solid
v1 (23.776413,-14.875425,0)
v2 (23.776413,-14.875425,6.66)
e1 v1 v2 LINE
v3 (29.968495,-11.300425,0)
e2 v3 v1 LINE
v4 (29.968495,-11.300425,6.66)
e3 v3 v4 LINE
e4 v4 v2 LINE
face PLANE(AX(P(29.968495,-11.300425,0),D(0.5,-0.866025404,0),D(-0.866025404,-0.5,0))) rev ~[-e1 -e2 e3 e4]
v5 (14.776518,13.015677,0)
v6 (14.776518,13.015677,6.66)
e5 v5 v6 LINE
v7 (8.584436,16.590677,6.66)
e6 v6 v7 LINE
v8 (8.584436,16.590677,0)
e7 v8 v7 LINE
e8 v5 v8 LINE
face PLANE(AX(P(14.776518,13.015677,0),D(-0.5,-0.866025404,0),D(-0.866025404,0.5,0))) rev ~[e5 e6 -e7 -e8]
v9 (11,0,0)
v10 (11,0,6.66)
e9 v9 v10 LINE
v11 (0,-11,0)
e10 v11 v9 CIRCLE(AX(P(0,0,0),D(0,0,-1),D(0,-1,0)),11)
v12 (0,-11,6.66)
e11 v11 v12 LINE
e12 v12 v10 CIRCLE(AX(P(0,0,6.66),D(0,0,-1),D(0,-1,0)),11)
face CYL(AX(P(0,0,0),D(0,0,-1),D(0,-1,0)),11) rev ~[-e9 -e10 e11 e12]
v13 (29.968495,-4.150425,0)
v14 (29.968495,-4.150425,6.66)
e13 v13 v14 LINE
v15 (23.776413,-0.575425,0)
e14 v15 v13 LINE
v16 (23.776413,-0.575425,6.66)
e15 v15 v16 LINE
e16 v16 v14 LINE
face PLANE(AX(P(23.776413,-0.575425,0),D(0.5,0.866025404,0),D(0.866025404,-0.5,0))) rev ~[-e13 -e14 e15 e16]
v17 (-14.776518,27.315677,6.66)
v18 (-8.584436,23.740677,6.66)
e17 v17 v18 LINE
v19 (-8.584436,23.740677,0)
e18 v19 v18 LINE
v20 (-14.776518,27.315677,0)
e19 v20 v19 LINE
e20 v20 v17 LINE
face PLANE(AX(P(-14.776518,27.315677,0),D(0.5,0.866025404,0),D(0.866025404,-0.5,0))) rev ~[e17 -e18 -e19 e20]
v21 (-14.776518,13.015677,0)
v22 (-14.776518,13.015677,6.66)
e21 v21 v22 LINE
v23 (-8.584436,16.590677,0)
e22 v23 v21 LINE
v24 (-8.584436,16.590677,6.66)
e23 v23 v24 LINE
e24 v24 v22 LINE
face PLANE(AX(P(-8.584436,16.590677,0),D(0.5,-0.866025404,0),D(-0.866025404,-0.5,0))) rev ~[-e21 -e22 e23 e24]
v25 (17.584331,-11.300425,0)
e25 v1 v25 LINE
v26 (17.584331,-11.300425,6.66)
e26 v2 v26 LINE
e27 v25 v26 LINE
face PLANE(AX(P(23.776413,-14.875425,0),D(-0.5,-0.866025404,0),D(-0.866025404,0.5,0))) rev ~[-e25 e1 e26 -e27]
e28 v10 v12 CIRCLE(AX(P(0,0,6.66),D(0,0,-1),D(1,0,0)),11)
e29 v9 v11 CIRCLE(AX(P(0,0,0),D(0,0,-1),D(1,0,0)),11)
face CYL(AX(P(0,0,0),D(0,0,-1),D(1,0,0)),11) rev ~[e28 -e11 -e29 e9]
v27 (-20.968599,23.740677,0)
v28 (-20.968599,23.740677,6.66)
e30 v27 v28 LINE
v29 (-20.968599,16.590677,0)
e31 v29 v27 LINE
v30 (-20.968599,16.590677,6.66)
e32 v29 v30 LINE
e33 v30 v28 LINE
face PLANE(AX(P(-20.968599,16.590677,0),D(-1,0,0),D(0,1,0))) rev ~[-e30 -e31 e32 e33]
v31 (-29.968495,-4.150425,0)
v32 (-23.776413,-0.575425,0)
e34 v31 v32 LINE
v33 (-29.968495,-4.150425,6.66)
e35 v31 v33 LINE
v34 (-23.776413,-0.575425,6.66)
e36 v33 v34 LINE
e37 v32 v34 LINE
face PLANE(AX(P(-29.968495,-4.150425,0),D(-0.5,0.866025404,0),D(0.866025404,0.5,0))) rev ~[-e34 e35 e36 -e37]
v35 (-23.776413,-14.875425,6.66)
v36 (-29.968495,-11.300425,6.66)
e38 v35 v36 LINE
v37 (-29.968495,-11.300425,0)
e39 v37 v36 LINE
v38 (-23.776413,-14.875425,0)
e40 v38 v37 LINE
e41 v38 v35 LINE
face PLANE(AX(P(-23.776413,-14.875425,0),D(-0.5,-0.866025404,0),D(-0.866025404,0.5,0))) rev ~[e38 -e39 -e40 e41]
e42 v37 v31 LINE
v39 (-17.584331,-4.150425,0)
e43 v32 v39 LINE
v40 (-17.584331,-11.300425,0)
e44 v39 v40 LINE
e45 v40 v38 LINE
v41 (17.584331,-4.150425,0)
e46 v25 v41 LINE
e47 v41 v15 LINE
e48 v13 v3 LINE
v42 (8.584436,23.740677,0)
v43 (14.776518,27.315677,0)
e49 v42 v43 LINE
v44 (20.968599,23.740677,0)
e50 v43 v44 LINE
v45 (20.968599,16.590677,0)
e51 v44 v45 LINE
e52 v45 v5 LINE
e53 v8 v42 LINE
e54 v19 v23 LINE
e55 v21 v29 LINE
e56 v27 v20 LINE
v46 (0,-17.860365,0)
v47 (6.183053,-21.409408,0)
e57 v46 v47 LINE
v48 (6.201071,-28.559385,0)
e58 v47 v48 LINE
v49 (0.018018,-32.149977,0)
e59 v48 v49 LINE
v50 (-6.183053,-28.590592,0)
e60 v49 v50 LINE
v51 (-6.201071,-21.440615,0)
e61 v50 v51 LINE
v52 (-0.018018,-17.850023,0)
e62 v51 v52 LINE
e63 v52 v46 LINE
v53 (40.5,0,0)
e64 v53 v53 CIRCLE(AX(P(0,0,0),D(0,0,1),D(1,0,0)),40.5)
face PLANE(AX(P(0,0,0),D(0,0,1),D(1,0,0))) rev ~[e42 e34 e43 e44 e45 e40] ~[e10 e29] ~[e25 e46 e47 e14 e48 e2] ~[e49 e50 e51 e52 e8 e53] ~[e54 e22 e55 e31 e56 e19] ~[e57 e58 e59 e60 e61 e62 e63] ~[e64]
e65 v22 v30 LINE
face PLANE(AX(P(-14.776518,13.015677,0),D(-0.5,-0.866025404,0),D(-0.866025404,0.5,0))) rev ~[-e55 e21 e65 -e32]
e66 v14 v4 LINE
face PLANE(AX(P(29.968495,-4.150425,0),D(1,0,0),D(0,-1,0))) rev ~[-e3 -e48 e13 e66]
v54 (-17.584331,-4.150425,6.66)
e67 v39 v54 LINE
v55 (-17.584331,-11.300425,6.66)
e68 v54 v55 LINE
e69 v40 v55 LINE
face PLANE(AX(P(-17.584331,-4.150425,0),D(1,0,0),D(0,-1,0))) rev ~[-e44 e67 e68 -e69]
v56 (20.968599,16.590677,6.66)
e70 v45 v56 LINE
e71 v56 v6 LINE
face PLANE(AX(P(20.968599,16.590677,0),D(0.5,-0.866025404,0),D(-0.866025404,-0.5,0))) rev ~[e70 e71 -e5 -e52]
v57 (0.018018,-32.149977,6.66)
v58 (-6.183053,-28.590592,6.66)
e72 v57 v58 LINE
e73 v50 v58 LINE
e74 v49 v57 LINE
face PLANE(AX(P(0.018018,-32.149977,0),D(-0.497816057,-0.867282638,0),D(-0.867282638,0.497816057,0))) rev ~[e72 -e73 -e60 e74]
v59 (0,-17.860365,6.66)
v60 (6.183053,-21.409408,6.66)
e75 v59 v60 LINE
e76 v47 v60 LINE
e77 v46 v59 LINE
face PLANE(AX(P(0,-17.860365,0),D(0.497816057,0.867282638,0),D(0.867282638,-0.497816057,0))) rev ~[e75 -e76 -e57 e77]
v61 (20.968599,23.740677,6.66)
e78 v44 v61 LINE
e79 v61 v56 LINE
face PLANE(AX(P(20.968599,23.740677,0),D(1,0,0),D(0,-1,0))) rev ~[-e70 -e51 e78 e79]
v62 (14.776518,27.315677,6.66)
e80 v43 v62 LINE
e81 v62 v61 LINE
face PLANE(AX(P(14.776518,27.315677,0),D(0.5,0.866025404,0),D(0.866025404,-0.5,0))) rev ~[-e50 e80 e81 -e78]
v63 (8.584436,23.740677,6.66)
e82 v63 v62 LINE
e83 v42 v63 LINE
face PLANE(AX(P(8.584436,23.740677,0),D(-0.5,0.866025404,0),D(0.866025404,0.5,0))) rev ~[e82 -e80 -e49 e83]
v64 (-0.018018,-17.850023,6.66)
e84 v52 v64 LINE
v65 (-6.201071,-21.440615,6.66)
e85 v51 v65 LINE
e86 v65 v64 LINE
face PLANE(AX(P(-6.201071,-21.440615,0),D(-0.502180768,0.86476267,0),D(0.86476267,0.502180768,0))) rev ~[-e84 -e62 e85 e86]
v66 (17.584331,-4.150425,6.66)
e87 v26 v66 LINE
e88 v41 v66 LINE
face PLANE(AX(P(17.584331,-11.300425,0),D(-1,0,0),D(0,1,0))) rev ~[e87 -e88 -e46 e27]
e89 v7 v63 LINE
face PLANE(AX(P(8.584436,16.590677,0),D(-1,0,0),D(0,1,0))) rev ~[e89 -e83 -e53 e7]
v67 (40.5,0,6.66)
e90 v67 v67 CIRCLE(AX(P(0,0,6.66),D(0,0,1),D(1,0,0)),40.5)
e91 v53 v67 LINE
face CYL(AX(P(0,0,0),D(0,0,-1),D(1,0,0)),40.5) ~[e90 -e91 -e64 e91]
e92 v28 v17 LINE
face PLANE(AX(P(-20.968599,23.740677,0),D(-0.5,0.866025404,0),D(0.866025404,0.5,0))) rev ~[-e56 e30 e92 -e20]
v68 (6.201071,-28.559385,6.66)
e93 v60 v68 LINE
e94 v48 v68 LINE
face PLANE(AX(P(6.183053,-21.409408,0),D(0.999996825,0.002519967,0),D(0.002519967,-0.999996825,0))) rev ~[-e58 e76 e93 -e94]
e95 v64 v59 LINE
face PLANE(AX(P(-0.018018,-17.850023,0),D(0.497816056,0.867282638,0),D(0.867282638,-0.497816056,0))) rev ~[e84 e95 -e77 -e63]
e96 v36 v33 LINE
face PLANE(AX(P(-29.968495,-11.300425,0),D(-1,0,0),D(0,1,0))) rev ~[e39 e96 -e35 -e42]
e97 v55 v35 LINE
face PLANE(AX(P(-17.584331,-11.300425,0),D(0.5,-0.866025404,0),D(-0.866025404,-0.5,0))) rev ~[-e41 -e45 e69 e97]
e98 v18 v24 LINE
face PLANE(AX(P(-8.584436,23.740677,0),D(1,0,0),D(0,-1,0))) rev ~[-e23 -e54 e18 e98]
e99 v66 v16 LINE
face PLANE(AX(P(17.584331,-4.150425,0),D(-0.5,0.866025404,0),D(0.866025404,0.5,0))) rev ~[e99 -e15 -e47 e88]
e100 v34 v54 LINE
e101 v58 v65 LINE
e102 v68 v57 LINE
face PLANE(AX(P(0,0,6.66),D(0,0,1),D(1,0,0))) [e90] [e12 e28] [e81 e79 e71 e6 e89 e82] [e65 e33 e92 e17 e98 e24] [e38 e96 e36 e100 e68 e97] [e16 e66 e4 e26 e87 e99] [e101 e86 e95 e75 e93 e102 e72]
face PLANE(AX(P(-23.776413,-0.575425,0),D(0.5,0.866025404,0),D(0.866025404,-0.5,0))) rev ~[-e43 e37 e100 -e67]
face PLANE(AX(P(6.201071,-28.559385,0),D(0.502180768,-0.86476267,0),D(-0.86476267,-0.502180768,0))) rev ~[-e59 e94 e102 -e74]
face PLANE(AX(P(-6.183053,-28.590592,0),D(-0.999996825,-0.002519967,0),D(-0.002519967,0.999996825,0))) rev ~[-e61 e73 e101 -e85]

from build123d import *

# Parameters (mm, degrees)
F0_R     = 40.5
F1_DEPTH = 6.66


# Not quite as in the source:
# - a feature names something its author has since deleted; it is built from what else it names


with BuildPart() as f1:
    # F0 (on Top) → F1 (new body)
    with BuildSketch(Plane.XY):
        Circle(F0_R)
        Polygon((-23.7764129074, -14.8754248594), (-29.9684945444, -11.3004248594), (-29.9684945444, -4.1504248594), (-23.7764129074, -0.5754248594), (-17.5843312703, -4.1504248594), (-17.5843312703, -11.3004248594), align=None, mode=Mode.SUBTRACT)
        Polygon((-0.0180177662, -17.8500227021), (0, -17.8603648131), (6.1830530933, -21.4094075078), (6.2010708595, -28.5593848057), (0.0180177662, -32.1499772979), (-6.1830530933, -28.5905924922), (-6.2010708595, -21.4406151943), align=None, mode=Mode.SUBTRACT)
        Polygon((23.7764129074, -0.5754248594), (29.9684945444, -4.1504248594), (29.9684945444, -11.3004248594), (23.7764129074, -14.8754248594), (17.5843312703, -11.3004248594), (17.5843312703, -4.1504248594), align=None, mode=Mode.SUBTRACT)
        Polygon((-14.7765176587, 27.3156769259), (-8.5844360217, 23.7406769259), (-8.5844360217, 16.5906769259), (-14.7765176587, 13.0156769259), (-20.9685992958, 16.5906769259), (-20.9685992958, 23.7406769259), align=None, mode=Mode.SUBTRACT)
        with BuildLine():
            ThreePointArc((0, -11), (-7.7781745931, 7.7781745931), (11, 0))
            ThreePointArc((11, 0), (7.7781745931, -7.7781745931), (0, -11))
        make_face(mode=Mode.SUBTRACT)
        Polygon((14.7765176587, 27.3156769259), (20.9685992958, 23.7406769259), (20.9685992958, 16.5906769259), (14.7765176587, 13.0156769259), (8.5844360217, 16.5906769259), (8.5844360217, 23.7406769259), align=None, mode=Mode.SUBTRACT)
    extrude(amount=F1_DEPTH)


solid = f1.part
